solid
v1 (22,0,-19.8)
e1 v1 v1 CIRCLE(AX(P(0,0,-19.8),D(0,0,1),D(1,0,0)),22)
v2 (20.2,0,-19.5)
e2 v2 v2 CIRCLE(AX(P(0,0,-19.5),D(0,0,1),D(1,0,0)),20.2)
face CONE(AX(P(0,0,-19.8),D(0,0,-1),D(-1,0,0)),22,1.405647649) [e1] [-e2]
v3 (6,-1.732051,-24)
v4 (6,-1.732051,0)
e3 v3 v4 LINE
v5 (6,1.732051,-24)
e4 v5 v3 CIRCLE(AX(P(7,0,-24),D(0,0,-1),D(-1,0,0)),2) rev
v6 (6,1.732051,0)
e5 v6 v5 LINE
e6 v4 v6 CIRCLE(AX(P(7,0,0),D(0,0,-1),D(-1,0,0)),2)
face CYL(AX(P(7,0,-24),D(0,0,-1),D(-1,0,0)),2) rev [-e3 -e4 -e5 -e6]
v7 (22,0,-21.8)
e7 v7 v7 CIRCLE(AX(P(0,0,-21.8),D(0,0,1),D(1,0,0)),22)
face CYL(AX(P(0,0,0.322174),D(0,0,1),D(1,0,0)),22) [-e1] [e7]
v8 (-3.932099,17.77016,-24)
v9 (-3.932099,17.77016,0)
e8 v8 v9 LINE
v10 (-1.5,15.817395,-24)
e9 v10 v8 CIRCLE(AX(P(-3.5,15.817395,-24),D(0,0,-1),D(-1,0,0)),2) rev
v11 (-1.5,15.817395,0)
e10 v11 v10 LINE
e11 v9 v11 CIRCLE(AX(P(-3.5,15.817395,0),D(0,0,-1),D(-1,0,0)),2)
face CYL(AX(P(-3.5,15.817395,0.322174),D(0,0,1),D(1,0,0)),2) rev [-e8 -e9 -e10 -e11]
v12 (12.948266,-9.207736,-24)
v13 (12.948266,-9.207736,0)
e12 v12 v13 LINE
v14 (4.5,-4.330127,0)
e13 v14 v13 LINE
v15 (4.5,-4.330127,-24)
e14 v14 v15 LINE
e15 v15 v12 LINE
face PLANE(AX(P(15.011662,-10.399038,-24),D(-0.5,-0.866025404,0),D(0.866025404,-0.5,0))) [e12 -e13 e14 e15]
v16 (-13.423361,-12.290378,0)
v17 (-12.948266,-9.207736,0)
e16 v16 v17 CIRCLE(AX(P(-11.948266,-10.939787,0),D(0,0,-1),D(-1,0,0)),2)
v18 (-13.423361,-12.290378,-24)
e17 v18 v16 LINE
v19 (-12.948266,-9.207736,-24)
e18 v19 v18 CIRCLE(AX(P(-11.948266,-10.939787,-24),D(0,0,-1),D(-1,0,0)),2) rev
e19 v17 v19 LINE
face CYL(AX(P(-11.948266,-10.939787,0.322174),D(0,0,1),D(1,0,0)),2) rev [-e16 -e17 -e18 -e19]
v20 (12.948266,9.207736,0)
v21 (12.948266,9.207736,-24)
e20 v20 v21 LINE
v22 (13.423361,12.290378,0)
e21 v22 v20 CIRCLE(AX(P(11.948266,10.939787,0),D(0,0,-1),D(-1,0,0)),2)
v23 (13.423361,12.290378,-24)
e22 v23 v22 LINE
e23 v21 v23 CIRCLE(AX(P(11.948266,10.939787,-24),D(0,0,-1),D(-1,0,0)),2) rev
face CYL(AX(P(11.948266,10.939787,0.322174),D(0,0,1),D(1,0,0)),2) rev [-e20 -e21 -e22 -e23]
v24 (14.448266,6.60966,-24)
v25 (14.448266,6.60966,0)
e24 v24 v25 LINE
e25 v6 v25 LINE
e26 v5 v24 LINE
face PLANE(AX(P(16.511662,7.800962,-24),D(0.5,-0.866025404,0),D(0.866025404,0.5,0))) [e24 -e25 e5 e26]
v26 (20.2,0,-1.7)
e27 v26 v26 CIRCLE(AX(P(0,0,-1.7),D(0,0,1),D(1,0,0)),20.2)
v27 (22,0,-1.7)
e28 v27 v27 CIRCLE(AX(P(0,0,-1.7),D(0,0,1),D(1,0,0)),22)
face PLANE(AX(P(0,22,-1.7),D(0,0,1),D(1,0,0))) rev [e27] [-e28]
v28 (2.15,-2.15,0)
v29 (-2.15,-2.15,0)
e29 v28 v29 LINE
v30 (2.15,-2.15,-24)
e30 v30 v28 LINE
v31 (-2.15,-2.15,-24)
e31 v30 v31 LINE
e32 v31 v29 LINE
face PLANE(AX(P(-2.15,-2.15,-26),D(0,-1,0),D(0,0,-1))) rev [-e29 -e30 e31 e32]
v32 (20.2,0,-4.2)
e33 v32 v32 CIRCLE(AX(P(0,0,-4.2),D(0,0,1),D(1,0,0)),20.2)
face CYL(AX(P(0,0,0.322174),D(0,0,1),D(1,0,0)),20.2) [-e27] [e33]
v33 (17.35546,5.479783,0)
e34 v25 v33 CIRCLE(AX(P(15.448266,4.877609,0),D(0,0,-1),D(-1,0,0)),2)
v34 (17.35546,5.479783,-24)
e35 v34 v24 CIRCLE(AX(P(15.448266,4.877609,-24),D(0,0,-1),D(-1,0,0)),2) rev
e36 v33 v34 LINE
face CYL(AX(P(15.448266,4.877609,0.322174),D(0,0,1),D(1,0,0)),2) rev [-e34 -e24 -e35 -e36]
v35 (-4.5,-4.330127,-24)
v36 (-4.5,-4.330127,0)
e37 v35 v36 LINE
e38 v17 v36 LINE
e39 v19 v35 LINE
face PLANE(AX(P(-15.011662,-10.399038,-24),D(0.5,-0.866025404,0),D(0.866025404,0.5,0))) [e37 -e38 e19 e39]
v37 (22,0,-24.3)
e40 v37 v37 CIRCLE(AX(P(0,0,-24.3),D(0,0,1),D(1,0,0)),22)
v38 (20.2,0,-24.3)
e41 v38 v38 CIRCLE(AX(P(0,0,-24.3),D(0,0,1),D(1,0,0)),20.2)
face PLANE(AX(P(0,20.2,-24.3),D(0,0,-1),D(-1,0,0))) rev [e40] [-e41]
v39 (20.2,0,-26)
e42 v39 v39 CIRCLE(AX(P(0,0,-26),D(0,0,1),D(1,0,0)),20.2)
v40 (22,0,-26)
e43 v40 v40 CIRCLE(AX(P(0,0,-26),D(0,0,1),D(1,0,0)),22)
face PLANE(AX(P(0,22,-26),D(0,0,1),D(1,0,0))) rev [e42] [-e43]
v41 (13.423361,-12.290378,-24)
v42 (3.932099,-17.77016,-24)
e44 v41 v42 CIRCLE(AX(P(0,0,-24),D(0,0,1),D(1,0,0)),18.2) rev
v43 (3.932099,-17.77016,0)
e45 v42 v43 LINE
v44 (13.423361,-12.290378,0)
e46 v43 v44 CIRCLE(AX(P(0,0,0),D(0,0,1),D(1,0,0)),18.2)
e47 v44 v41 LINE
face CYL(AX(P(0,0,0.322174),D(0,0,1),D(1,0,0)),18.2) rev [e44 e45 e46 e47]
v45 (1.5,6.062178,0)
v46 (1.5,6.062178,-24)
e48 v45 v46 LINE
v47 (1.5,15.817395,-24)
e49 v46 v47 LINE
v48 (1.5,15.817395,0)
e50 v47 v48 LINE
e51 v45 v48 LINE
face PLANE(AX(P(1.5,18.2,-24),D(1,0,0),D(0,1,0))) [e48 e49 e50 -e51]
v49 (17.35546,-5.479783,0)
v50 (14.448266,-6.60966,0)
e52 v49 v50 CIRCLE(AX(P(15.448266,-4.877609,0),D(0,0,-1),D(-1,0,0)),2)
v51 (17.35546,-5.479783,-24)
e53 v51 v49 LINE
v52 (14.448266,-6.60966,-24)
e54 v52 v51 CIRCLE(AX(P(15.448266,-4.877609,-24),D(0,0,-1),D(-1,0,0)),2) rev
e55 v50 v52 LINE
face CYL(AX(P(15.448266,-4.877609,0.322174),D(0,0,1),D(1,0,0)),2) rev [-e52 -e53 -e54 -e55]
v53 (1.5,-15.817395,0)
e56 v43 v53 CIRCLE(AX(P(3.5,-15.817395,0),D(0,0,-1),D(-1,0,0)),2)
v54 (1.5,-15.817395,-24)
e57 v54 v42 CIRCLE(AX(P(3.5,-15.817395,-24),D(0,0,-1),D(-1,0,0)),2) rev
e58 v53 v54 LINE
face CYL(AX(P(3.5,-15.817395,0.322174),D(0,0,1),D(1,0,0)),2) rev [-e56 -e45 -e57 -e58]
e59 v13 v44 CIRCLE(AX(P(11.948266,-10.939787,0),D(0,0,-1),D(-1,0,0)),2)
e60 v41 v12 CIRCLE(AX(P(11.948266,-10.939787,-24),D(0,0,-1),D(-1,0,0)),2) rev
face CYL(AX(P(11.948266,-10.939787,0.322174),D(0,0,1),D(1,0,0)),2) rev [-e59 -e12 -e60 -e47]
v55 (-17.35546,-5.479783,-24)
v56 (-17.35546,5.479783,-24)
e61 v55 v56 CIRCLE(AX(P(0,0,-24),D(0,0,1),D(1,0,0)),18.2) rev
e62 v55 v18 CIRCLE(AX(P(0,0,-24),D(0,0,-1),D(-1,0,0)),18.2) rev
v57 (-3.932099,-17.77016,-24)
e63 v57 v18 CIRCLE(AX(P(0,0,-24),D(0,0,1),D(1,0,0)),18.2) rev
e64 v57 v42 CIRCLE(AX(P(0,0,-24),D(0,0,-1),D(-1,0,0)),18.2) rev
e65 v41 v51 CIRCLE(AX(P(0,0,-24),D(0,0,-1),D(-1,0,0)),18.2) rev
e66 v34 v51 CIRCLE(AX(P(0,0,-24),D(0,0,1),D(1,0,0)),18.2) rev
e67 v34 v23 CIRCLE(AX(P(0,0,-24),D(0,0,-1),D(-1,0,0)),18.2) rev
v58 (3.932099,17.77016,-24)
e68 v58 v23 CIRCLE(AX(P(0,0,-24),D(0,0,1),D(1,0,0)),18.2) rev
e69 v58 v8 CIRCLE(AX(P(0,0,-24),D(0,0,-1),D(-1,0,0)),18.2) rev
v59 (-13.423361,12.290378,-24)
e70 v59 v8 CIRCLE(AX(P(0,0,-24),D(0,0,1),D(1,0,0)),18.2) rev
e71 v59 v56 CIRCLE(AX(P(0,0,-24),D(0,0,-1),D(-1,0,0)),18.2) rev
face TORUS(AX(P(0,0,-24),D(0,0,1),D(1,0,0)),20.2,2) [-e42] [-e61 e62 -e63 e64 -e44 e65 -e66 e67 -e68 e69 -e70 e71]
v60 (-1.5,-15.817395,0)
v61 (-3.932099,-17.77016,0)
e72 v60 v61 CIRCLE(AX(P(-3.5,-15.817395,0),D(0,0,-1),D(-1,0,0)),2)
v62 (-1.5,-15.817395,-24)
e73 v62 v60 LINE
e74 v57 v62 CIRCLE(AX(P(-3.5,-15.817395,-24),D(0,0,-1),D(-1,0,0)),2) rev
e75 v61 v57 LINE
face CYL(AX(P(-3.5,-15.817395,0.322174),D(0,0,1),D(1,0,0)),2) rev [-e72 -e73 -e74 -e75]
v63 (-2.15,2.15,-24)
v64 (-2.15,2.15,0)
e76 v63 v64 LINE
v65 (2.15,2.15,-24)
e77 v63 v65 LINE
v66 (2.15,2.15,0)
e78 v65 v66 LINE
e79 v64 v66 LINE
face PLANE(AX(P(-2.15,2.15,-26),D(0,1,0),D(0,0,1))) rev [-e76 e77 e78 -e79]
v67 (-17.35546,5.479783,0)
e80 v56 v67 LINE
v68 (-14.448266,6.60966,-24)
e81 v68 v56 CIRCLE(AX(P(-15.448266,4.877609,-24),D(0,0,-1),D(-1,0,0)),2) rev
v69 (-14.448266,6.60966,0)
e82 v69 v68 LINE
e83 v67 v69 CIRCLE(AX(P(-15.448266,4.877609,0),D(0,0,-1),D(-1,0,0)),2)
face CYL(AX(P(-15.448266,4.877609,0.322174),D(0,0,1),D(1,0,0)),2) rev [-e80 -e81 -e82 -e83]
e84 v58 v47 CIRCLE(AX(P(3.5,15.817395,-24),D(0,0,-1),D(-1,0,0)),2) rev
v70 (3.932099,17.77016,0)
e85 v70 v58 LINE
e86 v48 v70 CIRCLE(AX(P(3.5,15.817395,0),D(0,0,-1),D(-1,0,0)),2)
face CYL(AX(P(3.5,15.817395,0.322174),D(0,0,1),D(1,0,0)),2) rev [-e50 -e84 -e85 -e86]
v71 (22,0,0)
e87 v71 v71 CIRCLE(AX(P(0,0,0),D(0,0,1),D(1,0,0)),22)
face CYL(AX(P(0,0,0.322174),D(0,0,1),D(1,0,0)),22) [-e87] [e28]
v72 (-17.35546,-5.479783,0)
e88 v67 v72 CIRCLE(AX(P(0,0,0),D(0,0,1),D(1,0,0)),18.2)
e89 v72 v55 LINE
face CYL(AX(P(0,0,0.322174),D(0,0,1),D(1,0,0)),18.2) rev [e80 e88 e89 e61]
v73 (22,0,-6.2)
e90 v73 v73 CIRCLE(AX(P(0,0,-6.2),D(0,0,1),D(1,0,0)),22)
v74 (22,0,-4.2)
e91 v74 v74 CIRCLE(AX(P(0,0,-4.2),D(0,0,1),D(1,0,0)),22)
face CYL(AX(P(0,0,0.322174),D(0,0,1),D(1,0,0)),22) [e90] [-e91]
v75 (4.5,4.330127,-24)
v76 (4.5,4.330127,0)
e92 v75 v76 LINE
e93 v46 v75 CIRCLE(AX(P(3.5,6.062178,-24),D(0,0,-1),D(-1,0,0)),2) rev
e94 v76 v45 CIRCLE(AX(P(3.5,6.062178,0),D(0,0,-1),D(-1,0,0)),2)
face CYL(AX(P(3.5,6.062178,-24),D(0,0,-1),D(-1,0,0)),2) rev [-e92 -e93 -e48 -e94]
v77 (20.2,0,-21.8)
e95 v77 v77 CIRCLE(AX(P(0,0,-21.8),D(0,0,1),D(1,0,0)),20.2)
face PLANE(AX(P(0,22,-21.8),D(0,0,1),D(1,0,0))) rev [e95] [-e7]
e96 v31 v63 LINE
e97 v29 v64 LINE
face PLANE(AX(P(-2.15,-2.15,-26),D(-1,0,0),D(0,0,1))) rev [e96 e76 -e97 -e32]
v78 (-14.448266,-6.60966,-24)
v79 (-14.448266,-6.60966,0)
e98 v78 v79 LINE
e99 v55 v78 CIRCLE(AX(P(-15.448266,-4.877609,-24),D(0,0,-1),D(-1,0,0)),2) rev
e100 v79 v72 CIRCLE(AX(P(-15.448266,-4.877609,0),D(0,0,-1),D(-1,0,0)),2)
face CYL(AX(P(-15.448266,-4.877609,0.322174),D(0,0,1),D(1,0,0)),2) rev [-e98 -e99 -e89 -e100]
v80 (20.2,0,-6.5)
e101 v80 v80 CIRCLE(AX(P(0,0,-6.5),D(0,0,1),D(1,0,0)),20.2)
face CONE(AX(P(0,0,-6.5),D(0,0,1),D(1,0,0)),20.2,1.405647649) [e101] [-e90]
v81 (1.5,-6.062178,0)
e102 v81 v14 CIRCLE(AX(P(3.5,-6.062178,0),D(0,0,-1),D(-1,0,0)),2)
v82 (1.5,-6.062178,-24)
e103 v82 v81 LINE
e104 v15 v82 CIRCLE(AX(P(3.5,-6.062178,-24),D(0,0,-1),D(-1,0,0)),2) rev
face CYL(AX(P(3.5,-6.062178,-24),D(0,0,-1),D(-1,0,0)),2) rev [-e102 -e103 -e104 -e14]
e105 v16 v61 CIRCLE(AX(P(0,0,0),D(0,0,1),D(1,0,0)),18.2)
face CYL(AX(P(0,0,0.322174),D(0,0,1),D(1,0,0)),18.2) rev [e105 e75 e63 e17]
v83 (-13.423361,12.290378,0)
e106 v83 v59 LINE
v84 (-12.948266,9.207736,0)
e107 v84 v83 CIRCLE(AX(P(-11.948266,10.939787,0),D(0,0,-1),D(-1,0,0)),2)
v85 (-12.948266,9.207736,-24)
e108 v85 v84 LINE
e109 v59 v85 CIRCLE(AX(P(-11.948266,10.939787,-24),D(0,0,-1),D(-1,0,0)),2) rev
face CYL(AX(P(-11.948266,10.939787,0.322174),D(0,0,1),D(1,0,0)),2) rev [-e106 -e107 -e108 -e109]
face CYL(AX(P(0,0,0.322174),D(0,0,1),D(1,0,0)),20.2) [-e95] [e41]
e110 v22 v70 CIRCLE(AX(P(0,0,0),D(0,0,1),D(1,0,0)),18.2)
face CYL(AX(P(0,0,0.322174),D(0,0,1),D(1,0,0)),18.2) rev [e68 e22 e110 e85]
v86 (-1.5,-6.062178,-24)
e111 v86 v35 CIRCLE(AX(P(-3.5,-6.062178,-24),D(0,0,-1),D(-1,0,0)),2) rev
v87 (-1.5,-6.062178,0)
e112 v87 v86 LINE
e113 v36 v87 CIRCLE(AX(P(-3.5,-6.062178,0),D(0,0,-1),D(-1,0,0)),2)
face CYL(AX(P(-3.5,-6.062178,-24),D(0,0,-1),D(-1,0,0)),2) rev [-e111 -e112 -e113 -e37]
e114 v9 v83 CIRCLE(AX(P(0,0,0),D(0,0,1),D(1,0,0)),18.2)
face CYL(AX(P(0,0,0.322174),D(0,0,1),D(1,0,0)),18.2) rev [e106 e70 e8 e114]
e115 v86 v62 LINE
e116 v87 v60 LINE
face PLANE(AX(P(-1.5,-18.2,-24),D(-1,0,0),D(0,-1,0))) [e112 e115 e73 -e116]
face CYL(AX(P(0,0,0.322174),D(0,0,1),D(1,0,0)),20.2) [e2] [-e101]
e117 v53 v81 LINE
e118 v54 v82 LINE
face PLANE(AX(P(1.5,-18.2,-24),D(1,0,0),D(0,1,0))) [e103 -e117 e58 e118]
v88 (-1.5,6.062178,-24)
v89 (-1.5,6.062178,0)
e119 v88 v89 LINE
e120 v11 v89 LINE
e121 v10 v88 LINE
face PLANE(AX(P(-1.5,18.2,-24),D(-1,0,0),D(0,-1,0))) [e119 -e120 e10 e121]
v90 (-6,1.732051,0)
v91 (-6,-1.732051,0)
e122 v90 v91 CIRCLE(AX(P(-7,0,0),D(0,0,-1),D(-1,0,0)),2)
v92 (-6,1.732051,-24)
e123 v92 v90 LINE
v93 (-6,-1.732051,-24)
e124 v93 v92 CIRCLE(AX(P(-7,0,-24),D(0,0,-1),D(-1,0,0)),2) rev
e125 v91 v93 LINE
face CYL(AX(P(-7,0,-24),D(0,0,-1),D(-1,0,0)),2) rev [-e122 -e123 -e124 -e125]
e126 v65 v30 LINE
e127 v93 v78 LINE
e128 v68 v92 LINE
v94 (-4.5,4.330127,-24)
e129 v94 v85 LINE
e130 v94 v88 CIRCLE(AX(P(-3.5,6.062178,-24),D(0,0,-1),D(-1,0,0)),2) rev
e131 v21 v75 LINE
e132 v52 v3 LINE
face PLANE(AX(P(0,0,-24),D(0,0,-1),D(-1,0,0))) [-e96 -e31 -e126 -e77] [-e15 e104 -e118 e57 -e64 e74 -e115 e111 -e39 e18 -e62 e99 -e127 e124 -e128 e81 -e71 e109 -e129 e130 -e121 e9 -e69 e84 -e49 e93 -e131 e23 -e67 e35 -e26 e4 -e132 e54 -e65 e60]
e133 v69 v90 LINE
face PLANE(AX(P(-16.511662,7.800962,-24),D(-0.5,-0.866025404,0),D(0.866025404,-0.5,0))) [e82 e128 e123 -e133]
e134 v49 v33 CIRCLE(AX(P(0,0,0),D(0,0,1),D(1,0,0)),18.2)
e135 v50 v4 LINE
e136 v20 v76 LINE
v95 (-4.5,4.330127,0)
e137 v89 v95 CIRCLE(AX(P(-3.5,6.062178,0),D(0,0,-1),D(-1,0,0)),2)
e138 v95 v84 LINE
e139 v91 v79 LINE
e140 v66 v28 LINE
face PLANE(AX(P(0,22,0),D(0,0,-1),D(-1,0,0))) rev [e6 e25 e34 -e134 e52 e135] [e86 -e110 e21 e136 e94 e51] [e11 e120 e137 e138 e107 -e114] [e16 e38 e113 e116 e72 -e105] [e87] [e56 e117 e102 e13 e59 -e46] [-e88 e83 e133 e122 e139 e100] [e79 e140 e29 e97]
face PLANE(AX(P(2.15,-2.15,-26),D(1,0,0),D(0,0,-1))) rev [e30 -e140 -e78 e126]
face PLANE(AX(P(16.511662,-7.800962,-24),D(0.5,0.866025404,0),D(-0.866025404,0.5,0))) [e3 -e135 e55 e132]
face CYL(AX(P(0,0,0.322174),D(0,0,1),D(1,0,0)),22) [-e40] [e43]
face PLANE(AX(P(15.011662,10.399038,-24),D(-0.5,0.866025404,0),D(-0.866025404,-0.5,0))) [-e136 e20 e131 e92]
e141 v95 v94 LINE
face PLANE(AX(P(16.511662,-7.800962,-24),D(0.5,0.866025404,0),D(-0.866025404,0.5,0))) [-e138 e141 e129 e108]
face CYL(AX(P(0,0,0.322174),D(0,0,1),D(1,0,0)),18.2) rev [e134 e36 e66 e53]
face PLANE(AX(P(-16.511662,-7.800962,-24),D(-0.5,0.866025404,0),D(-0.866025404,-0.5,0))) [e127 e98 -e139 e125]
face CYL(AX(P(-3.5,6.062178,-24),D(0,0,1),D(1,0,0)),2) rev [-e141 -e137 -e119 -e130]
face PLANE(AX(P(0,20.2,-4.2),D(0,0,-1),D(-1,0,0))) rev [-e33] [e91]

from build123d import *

# Parameters (mm, degrees)
SKETCH2_W               = 3
SKETCH2_H               = 18.2
BOSS_EXTRUDE1_DEPTH     = 24
CIRPATTERN1_COUNT       = 6
CUT_EXTRUDE1_DEPTH      = 41.546269865
CUT_EXTRUDE1_DEPTH_BACK = 41.546269865
SKETCH3_W               = 4.3
SKETCH3_H               = 4.3
FILLET1_R               = 2
FILLET2_R               = 2


with BuildPart() as part:
    # Sketch1 → Revolve1 (revolve)
    with BuildSketch(Plane(origin=(0, 0, 0), x_dir=(0, 0, -1), z_dir=(1, 0, 0)), mode=Mode.PRIVATE) as revolve1_sk:
        Polygon((0, 22), (1.7, 22), (1.7, 20.2), (4.2, 20.2), (4.2, 22), (6.2, 22), (6.5, 20.2), (19.5, 20.2), (19.8, 22), (21.8, 22), (21.8, 20.2), (24.3, 20.2), (24.3, 22), (26, 22), (26, 18.2), (0, 18.2), align=None)
    revolve(revolve1_sk.sketch.rotate(Axis((0, 0, 0.322174052), (0, 0, -1)), 90), axis=Axis((0, 0, 0.322174052), (0, 0, -1)))

    # Sketch2 → Boss-Extrude1 (add)
    with BuildSketch(Plane.XY):
        with Locations((0, 9.1)):
            Rectangle(SKETCH2_W, SKETCH2_H)
    boss_extrude1 = extrude(amount=-BOSS_EXTRUDE1_DEPTH)

    # CirPattern1: Boss-Extrude1 ×6 about axis
    cirpattern1_axis = Axis((0, 0, 0), (0, 0, 1))
    for i in range(1, CIRPATTERN1_COUNT):
        add(boss_extrude1.rotate(cirpattern1_axis, i * 360 / CIRPATTERN1_COUNT))

    # Sketch3 → Cut-Extrude1 (cut, two sides: drawn at the far end of the back side and taken through both)
    with BuildSketch(Plane.XY.offset(-CUT_EXTRUDE1_DEPTH_BACK)):
        Rectangle(SKETCH3_W, SKETCH3_H)
    extrude(amount=CUT_EXTRUDE1_DEPTH + CUT_EXTRUDE1_DEPTH_BACK, mode=Mode.SUBTRACT)

    # Fillet1
    fillet1_edges = [part.edges().sort_by_distance(p)[0] for p in [
        (14.958039343, 10.368078849, -12),
        (-14.958039343, 10.368078849, -12),
        (-1.5, 18.138081486, -12),
        (1.5, 18.138081486, -12),
        (-16.458039343, 7.770002637, -12),
        (-14.958039343, -10.368078849, -12),
        (-16.458039343, -7.770002637, -12),
        (1.5, -18.138081486, -12),
        (-1.5, -18.138081486, -12),
        (14.958039343, -10.368078849, -12),
        (16.458039343, -7.770002637, -12),
        (16.458039343, 7.770002637, -12),
        (3, 0, -12),
        (1.5, -2.598076211, -12),
        (-1.5, -2.598076211, -12),
        (-3, 0, -12),
        (1.5, 2.598076211, -12),
        (-1.5, 2.598076211, -12),
    ]]
    fillet(fillet1_edges, radius=FILLET1_R)

    # Fillet2
    fillet2_edges = [part.edges().sort_by_distance(p)[0] for p in [
        (-18.2, 0, -26),
    ]]
    fillet(fillet2_edges, radius=FILLET2_R - 0.0001)  # a hair under: the kernel refuses the full size


solid = part.part
